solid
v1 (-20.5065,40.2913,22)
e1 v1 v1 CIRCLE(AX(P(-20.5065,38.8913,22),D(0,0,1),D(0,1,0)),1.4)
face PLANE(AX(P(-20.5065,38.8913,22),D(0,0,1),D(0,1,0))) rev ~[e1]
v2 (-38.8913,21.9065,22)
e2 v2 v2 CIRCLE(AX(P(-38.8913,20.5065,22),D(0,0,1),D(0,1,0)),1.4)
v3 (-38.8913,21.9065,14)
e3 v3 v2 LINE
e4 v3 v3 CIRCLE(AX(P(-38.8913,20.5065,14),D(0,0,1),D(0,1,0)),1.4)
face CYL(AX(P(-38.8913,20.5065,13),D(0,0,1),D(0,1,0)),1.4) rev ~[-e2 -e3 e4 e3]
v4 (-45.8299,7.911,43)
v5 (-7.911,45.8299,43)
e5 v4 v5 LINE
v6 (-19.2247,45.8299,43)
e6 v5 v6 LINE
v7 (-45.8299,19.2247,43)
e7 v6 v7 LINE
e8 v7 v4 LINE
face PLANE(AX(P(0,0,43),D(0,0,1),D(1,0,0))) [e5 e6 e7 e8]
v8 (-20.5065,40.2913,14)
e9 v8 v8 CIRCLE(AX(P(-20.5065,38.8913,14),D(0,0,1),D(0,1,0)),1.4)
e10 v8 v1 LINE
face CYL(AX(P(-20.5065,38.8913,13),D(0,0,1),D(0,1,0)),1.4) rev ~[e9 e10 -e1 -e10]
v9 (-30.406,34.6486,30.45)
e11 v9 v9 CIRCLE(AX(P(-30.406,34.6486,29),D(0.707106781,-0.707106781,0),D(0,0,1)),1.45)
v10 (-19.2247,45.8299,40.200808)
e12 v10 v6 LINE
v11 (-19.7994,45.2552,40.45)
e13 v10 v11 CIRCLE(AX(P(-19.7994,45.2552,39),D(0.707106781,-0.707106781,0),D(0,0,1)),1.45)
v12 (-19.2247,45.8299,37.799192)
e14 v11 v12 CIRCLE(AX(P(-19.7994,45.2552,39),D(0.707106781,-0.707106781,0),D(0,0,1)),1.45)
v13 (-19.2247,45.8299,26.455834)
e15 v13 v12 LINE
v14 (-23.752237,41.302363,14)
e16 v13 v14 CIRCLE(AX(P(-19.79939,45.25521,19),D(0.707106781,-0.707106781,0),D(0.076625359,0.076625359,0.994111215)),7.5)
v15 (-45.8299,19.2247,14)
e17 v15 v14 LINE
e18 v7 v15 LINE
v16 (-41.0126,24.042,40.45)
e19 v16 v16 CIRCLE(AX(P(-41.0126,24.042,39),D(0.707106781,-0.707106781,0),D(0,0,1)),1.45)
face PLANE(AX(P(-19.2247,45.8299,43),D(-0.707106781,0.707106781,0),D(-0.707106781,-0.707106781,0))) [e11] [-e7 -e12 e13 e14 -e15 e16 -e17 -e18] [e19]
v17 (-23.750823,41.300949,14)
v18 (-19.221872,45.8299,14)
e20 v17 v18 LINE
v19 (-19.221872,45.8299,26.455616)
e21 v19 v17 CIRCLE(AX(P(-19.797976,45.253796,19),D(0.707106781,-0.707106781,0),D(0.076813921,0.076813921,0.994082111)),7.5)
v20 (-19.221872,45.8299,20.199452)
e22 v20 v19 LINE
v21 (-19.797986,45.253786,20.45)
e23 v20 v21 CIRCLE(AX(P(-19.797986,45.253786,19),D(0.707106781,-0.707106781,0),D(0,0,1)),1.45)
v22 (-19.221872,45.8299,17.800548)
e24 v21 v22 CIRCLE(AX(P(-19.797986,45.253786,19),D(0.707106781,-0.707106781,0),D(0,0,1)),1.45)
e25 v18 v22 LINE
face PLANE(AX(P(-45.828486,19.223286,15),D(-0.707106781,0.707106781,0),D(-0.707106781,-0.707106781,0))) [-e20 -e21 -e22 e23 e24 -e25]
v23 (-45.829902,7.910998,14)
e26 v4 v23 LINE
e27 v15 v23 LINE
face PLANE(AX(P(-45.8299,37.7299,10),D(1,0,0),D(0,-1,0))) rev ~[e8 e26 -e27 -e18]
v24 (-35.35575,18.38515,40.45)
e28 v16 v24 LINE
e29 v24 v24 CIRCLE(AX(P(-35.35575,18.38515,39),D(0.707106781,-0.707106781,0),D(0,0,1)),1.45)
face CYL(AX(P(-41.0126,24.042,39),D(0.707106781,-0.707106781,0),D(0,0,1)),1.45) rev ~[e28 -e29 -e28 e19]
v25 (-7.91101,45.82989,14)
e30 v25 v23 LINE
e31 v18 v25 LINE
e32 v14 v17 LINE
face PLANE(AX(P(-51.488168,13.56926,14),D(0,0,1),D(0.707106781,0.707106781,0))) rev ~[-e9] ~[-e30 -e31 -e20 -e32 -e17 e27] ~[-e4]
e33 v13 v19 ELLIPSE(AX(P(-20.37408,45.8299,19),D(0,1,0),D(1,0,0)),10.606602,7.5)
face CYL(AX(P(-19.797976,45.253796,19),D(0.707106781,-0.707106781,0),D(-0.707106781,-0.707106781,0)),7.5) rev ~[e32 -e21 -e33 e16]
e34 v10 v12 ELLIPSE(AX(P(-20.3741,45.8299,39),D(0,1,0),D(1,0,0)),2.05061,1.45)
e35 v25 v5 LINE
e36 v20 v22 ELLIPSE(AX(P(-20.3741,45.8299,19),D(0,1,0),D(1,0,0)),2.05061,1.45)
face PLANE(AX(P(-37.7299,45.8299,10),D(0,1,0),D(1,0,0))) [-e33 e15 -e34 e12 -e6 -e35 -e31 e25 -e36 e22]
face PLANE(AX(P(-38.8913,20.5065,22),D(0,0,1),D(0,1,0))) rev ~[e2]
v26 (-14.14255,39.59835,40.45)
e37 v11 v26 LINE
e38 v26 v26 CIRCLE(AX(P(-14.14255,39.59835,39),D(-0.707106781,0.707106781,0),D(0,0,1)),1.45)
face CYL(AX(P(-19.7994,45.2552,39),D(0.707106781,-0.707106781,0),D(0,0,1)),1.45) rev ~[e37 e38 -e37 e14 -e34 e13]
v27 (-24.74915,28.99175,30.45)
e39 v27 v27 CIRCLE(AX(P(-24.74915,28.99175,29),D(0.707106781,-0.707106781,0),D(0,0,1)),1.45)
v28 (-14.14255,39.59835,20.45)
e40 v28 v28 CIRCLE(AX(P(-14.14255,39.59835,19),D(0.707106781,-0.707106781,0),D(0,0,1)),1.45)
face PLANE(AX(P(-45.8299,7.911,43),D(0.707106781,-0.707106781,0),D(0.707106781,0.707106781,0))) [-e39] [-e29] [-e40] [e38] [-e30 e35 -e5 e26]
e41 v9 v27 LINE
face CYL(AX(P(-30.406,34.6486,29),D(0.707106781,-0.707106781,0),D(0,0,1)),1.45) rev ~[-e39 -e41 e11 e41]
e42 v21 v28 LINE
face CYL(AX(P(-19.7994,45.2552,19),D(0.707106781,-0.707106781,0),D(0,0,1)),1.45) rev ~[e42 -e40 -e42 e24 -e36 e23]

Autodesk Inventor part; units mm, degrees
ref_plane "YZ Plane" through (0, 0, 0) normal (1, 0, 0) x (0, 1, 0)
ref_plane "XZ Plane" through (0, 0, 0) normal (0, 1, 0) x (-1, 0, 0)
ref_plane "Work Plane1" through (0, 0, 10) normal (0, 0, 1) x (1, 0, 0)
sketch "Sketch1" plane through (0, 0, 10) normal (0, 0, 1) x (1, 0, 0)
  line L0 (-4.0299, -0.3538) -> (-2.2322, 1.4439) construction
  arc A0 (-1.4439, 2.2322) -> (-2.2322, 1.4439) centre (-0.9299, 0.9299) ccw construction
  line L1 (-1.4439, 2.2322) -> (0.3538, 4.0299) construction
  line L2 (-37.8299, 42.8299) -> (-37.8299, 37.8299) construction
  line L3 (-37.8299, 37.8299) -> (-42.9208, 37.8299) construction
  line L4 (-37.8299, 42.2137) -> (-37.8299, 45.8299) construction
  line L5 (-37.8299, 45.8299) -> (-4.0299, 45.8299) construction
  line L6 (-4.0299, 45.8299) -> (-4.0299, 42.2137) construction
  line L7 (-4.0299, 4.0299) -> (0.3538, 4.0299) projected
  circle A1 centre (-20.9299, 20.9299) radius 17.5 projected
  line L8 (-20.9299, 58.9723) -> (17.1124, 20.9299) construction
  line L9 (17.1124, 20.9299) -> (-20.9299, -17.1124) construction
  line L10 (-20.9299, -17.1124) -> (-58.9723, 20.9299) construction
  line L11 (-58.9723, 20.9299) -> (-20.9299, 58.9723) construction
  line L12 (-20.9299, 58.9723) -> (-20.9299, -17.1124) construction
  line L13 (17.1124, 20.9299) -> (-58.9723, 20.9299) construction
  line L14 (-20.9299, 58.9723) -> (32.8701, 58.9723) construction
  line L15 (-43.4299, 43.4299) -> (1.5701, 43.4299) construction
  line L16 (1.5701, 43.4299) -> (1.5701, -1.5701) construction
  line L17 (1.5701, -1.5701) -> (-43.4299, -1.5701) construction
  line L18 (-43.4299, -1.5701) -> (-43.4299, 43.4299) construction
  line L19 (-43.4299, 43.4299) -> (1.5701, -1.5701) construction
  line L20 (1.5701, 43.4299) -> (-43.4299, -1.5701) construction
  line L21 (-43.4299, 5.3876) -> (-43.4299, 36.4723)
  line L22 (-43.4299, 36.4723) -> (-36.4723, 43.4299)
  line L23 (-36.4723, 43.4299) -> (-5.3876, 43.4299)
  line L24 (-5.3876, 43.4299) -> (1.5701, 36.4723)
  line L25 (1.5701, 36.4723) -> (1.5701, 5.3876)
  line L26 (1.5701, 5.3876) -> (-5.3876, -1.5701)
  line L27 (-5.3876, -1.5701) -> (-36.4723, -1.5701)
  line L28 (-36.4723, -1.5701) -> (-43.4299, 5.3876)
  line L29 (-4.0299, 42.2137) -> (-37.8299, 42.2137) projected
  line L30 (-4.0299, -0.3538) -> (-4.0299, 4.0299) projected
  circle A2 centre (-20.9299, 20.9299) radius 1.4
  line L31 (-10.9299, 10.9299) -> (-30.9299, 10.9299) construction
  line L32 (-30.9299, 10.9299) -> (-30.9299, 30.9299) construction
  line L33 (-30.9299, 30.9299) -> (-10.9299, 30.9299) construction
  line L34 (-10.9299, 30.9299) -> (-10.9299, 10.9299) construction
  line L35 (-10.9299, 10.9299) -> (-30.9299, 30.9299) construction
  line L36 (-30.9299, 10.9299) -> (-10.9299, 30.9299) construction
  circle A3 centre (-30.9299, 30.9299) radius 1.4
  circle A4 centre (-30.9299, 10.9299) radius 1.4
  circle A5 centre (-10.9299, 10.9299) radius 1.4
  line L37 (-45.8299, 37.8299) -> (-42.0723, 37.8299) construction
  line L38 (-42.1723, 37.7299) -> (-45.8299, 37.7299)
  line L39 (-45.8299, 37.7299) -> (-45.8299, 4.1299)
  line L40 (-45.8299, 4.1299) -> (-42.1723, 4.1299)
  line L41 (-42.1723, 4.1299) -> (-42.1723, 37.7299)
  line L42 (-45.8299, 4.0299) -> (-42.0723, 4.0299) construction
  line L43 (-45.8299, 37.8299) -> (-42.0723, 37.8299) projected
  line L44 (-37.7299, 45.8299) -> (-4.1299, 45.8299)
  line L45 (-4.1299, 45.8299) -> (-4.1299, 42.1723)
  line L46 (-4.1299, 42.1723) -> (-37.7299, 42.1723)
  line L47 (-37.7299, 42.1723) -> (-37.7299, 45.8299)
  line L48 (0.4701, 37.8299) -> (0.4701, 4.0299) construction
  line L49 (0.4701, 4.0299) -> (3.9701, 4.0299) construction
  line L50 (3.9701, 37.8299) -> (3.9701, 4.0299) construction
  line L51 (0.4701, 37.8299) -> (3.9701, 37.8299) construction
  line L52 (-45.8299, -3.9701) -> (-4.0299, -3.9701) construction
  line L53 (0.3124, 37.7299) -> (3.9701, 37.7299)
  line L54 (3.9701, 37.7299) -> (3.9701, 4.1299)
  line L55 (3.9701, 4.1299) -> (0.3124, 4.1299)
  line L56 (0.3124, 4.1299) -> (0.3124, 37.7299)
  line L57 (-4.1713, -0.3538) -> (-37.7299, -0.3538)
  line L58 (-37.7299, -0.3538) -> (-37.7299, -3.9701)
  line L59 (-37.7299, -3.9701) -> (-4.1713, -3.9701)
  line L60 (-4.1713, -3.9701) -> (-4.1713, -0.3538)
  point P0 (-37.8299, 4.0299)
  dimension "d18" = 53.8
  dimension "d19" = 45
  dimension "d20" = 53.8
  dimension "d21" = 45
  dimension "d22" = 45
  dimension "d30" = 20
  dimension "d31" = 20
  dimension "d32" = 2.8
  dimension "d33" = 2.8
  dimension "d34" = 2.8
  dimension "d35" = 2.8
  dimension "d36" = 0.1
  dimension "d37" = 0.1
  dimension "d38" = 0.1
  dimension "d39" = 0.1
extrude "Extrusion1" add sketch "Sketch1" along normal blind 5 contours L30 L26 L57 L28 L41 L22 L46 L24 L56 L7 | L7 L26 L30 | L56 L24 L25 L26 | L26 L25 L24 L53 L54 L55 | L60 L59 L58 L57 L28 L27 L26 | L26 L27 L28 L57 | L46 L22 L29 L24 | L24 L29 L45 | L40 L39 L38 L22 L21 L28 | L28 L21 L22 L41 | L29 L22 L23 L24 | L24 L23 L22 L29 L47 L44 L45 | L47 L29 L22 | A1 | A2 | A3 | A4 | A5
sketch "Sketch4" plane through (0, 0, 15) normal (0, 0, 1) x (1, 0, 0)
  line L0 (-37.7299, 42.1723) -> (-42.1723, 37.7299) projected
  line L1 (-42.1723, 37.7299) -> (-45.8299, 37.7299) projected
  line L2 (-45.8299, 37.7299) -> (-45.8299, 4.1299) projected
  line L3 (-45.8299, 4.1299) -> (-42.1723, 4.1299) projected
  line L4 (-42.1723, 4.1299) -> (-37.6885, -0.3538) projected
  line L5 (-37.6885, -0.3538) -> (-37.7299, -0.3538) projected
  line L6 (-37.7299, -0.3538) -> (-37.7299, -3.9701) projected
  line L7 (-37.7299, -3.9701) -> (-4.1713, -3.9701) projected
  line L8 (-4.1713, -3.9701) -> (-4.1713, -0.3538) projected
  line L9 (-4.1713, -0.3538) -> (0.3124, 4.1299) projected
  line L10 (0.3124, 4.1299) -> (3.9701, 4.1299) projected
  line L11 (3.9701, 4.1299) -> (3.9701, 37.7299) projected
  line L12 (3.9701, 37.7299) -> (0.3124, 37.7299) projected
  line L13 (0.3124, 37.7299) -> (-4.1299, 42.1723) projected
  line L14 (-4.1299, 42.1723) -> (-4.1299, 45.8299) projected
  line L15 (-4.1299, 45.8299) -> (-37.7299, 45.8299) projected
  line L16 (-37.7299, 45.8299) -> (-37.7299, 42.1723) projected
  line L17 (-45.8299, 37.7299) -> (-45.8299, 4.1299) projected
  line L18 (-45.8299, 7.911) -> (-7.911, 45.8299)
  line L19 (-45.8299, 7.911) -> (7.7955, 7.911) construction
  line L20 (-7.911, 45.8299) -> (-19.2247, 45.8299)
  line L21 (-4.1299, 45.8299) -> (-37.7299, 45.8299) projected
  line L22 (-19.2247, 45.8299) -> (-45.8299, 19.2247)
  line L23 (-45.8299, 7.911) -> (-45.8299, 19.2247)
  circle A0 centre (-40.9299, 0.9299) radius 1.1933 projected
  circle A1 centre (-0.9299, 40.9299) radius 1.4 projected
  line L24 (-40.9299, 0.9299) -> (-0.9299, 40.9299)
  line L25 (0.3124, 37.7299) -> (-4.1299, 42.1723) projected
  point P0 (0, 0)
  dimension "d40" = 45
  dimension "d41" = 8
extrude "Extrusion4" add sketch "Sketch4" along normal blind 28 contours L15 L18 L2 L22
sketch "Sketch5" plane through (-45.8299, 19.2247, 15) normal (-0.7071068, 0.7071068, 0) x (-0.7071068, -0.7071068, 0)
  line L0 (0, 0) -> (-37.6254, 0) projected
  line L1 (0, 0) -> (0, 28) projected
  line L2 (-37.6254, 28) -> (0, 28) projected
  line L3 (-37.6254, 0) -> (-37.6254, 28) projected
  circle A0 centre (-18.8127, 9.1873) radius 18.8127
  line L4 (-6.8127, 24) -> (-36.8127, 24) construction
  line L5 (-36.8127, 24) -> (-36.8127, 4) construction
  line L6 (-36.8127, 4) -> (-6.8127, 4) construction
  line L7 (-6.8127, 4) -> (-6.8127, 24) construction
  line L8 (-6.8127, 24) -> (-36.8127, 4) construction
  line L9 (-36.8127, 24) -> (-6.8127, 4) construction
  point P0 (-18.8127, -15)
  point P1 (-21.8127, 14)
  dimension "d44" = 30
  dimension "d45" = 20
hole "Hole1" at (-19.7994, 45.2552, 39) at (-19.7994, 45.2552, 19) at (-41.0126, 24.042, 39) at (-30.406, 34.6486, 29) direction (0.7071068, -0.7071068, 0) diameter 2.9 depth 12
sketch "Sketch6" plane through (-37.7299, -3.9701, 10) normal (0, -1, 0) x (1, 0, 0)
  circle A0 centre (-3.2, 36.9) radius 1.45 projected
  circle A1 centre (36.8, 36.9) radius 1.45 projected
  line L0 (-6.1, 0) -> (-6.1, 39.8) projected
  line L1 (-0.1, 0) -> (-6.1, 0) projected
  line L2 (-0.1, 33.8) -> (-0.1, 0) projected
  line L3 (33.7, 33.8) -> (-0.1, 33.8) projected
  line L4 (33.7, 33.8) -> (33.7, 0) projected
  line L5 (39.7, 0) -> (33.7, 0) projected
  line L6 (39.7, 39.8) -> (39.7, 0) projected
  line L7 (-6.1, 39.8) -> (39.7, 39.8) projected
  circle A2 centre (16.8, 16.9) radius 16.9
  circle A3 centre (16.8, 16.9) radius 14.9
  line L8 (-0.1, 16.9) -> (-0.1, 0)
  line L9 (0, 0) -> (33.5586, 0) projected
  line L10 (0.0414, 0) -> (-4.4423, 0) projected
  line L11 (33.5586, 0) -> (0.0414, 0)
  line L12 (33.7, 16.9) -> (33.5586, 0)
  point P0 (37.7299, -10)
  dimension "d53" = 2
extrude "Extrusion5" cut sketch "Sketch6" against normal up to surface contours A3 surface through (-45.8299, 7.911, 15) normal (0.7071068, -0.7071068, 0)
ref_plane "Work Plane3" through (3.9701, 45.8299, 26) normal (1, 0, 0) x (0, -1, 0)
sketch "Sketch7" plane through (3.9701, 45.8299, 26) normal (1, 0, 0) x (0, -1, 0)
  line L0 (41.8, -17.8) -> (41.8, 16) projected
  line L1 (8, -17.8) -> (41.8, -17.8) projected
  line L2 (8, -17.8) -> (8, 16) projected
  circle A0 centre (24.9, -0.9) radius 16.9
  circle A1 centre (24.9, -0.9) radius 14.9
  point P0 (45.8299, 26)
  dimension "d56" = 2
ref_plane "Work Plane4" through (-34.8055, 8.3289, 16.6138) normal (0.7071068, -0.7071068, 0) x (0.7071068, 0.7071068, 0)
extrude "Extrusion6" cut sketch "Sketch7" against normal up to surface contours A1 surface through (-45.8299, 7.911, 15) normal (0.7071068, -0.7071068, 0)
sketch "Sketch8" plane through (-45.8299, 19.2247, 15) normal (-0.7071068, 0.7071068, 0) x (-0.7071068, -0.7071068, 0)
  arc A0 (-37.6254, 2.7992) -> (-37.6254, 5.2008) centre (-36.8127, 4) ccw projected
  circle A1 centre (-36.8127, 4) radius 7.5
  point P0 (-18.8127, -15)
  dimension "d59" = 15
extrude "Extrusion7" cut sketch "Sketch8" along normal blind 10
sketch "Sketch9" plane through (0, 0, 10) normal (0, 0, -1) x (-1, 0, 0)
  line L0 (45.8299, 19.2247) -> (24.2855, 40.7692) projected
  line L1 (41.7776, 11.9633) -> (26.8705, 26.8705) projected
  line L2 (26.8705, 26.8705) -> (11.9633, 41.7776) projected
  line L3 (19.2247, 45.8299) -> (24.2855, 40.7692) projected
  line L4 (7.911, 45.8299) -> (11.9633, 41.7776) projected
  line L5 (41.7776, 11.9633) -> (45.8299, 7.911) projected
  line L6 (15.1679, 38.5731) -> (20.8247, 44.2299) projected
  line L7 (13.1172, 40.6237) -> (18.3235, 45.8299) projected
  line L8 (34.3304, 19.4105) -> (39.9873, 25.0673) projected
  line L9 (36.3811, 17.3599) -> (42.0379, 23.0167) projected
  circle A0 centre (20.5065, 38.8913) radius 1.4
  line L10 (25.7745, 27.9665) -> (31.4313, 33.6233) projected
  line L11 (31.4313, 33.6233) -> (25.7745, 27.9665)
  line L12 (26.8705, 26.8705) -> (32.5273, 32.5273)
  circle A1 centre (38.8913, 20.5065) radius 1.4
  point P0 (0, 0)
  point P1 (34.7528, 24.7491)
  dimension "d62" = 2.8
hole "Hole2" at (-20.5065, 38.8913, 10) at (-38.8913, 20.5065, 10) direction (0, 0, 1) diameter 2.8 depth 12 counterbore diameter 5.5 counterbore depth 3
sketch "Sketch11" plane through (0, 0, 43) normal (0, 0, 1) x (1, 0, 0)
  line L0 (-7.911, 45.8299) -> (-19.2247, 45.8299) projected
  line L1 (-19.2247, 45.8299) -> (-45.8299, 19.2247) projected
  line L2 (-45.8299, 19.2247) -> (-45.8299, 7.911) projected
  line L3 (-45.8299, 7.911) -> (-7.911, 45.8299) projected
  line L4 (-45.8299, 37.7299) -> (-45.8299, 19.2247) projected
  line L5 (-42.1723, 37.7299) -> (-45.8299, 37.7299) projected
  line L6 (-37.7299, 42.1723) -> (-42.1723, 37.7299) projected
  line L7 (-37.7299, 45.8299) -> (-37.7299, 42.1723) projected
  line L8 (-29.3463, 45.8299) -> (-37.7299, 45.8299) projected
  line L9 (-29.3463, 45.8299) -> (-19.2247, 45.8299) projected
  line L10 (-4.1299, 45.8299) -> (-7.911, 45.8299) projected
  line L11 (-4.1299, 42.1723) -> (-4.1299, 45.8299) projected
  line L12 (0.3124, 37.7299) -> (-4.1299, 42.1723) projected
  line L13 (3.9701, 37.7299) -> (0.3124, 37.7299) projected
  line L14 (3.9701, 29.8965) -> (3.9701, 11.9633) projected
  line L15 (3.9701, 29.8965) -> (3.9701, 37.7299) projected
  line L16 (-11.9633, -3.9701) -> (-4.1713, -3.9701) projected
  line L17 (-4.1713, -3.9701) -> (-4.1713, -0.3538) projected
  line L18 (-4.1713, -0.3538) -> (0.3124, 4.1299) projected
  line L19 (0.3124, 4.1299) -> (3.9701, 4.1299) projected
  line L20 (3.9701, 4.1299) -> (3.9701, 11.9633) projected
  line L21 (-11.9633, -3.9701) -> (-29.8965, -3.9701) projected
  line L22 (-37.7299, -3.9701) -> (-29.8965, -3.9701) projected
  line L23 (-37.7299, -0.3538) -> (-37.7299, -3.9701) projected
  line L24 (-45.8299, 7.911) -> (-7.911, 45.8299) projected
  line L25 (-45.8299, 7.911) -> (-7.911, 45.8299)
  line L26 (-45.8299, 7.911) -> (-45.8299, 4.1299) projected
  line L27 (-45.8299, 4.1299) -> (-42.1723, 4.1299) projected
  line L28 (-37.6885, -0.3538) -> (-37.7299, -0.3538) projected
  line L29 (-42.1723, 4.1299) -> (-37.6885, -0.3538) projected
  point P0 (0, 0)
extrude "Extrusion8" cut sketch "Sketch11" against normal through all contours L10 L11 L12 L13 L15 L14 L20 L19 L18 L17 L16 L21 L22 L23 L28 L29 L27 L26 L3 | L1 L4 L5 L6 L7 L8 L9
sketch "Sketch12" plane through (-45.8299, 19.2247, 10) normal (-0.7071068, 0.7071068, 0) x (-0.7071068, -0.7071068, 0)
  line L0 (-45.6254, 33) -> (-45.6254, 0) projected
  line L1 (8, 0) -> (8, 33) projected
  line L2 (-45.6254, 0) -> (8, 0)
  line L3 (8, 0) -> (8, 4)
  line L4 (8, 4) -> (-45.6254, 4)
  line L5 (-45.6254, 4) -> (-45.6254, 0)
  point P0 (-18.8127, -10)
  point P1 (45.6254, -4)
  point P2 (45.6254, -5)
  point P3 (-8, -5)
  point P4 (-8, -4)
  dimension "d73" = 4
extrude "Extrusion9" cut sketch "Sketch12" against normal blind 29
properties part number "20_Cube_Insert_Kinematic_Mirrormount_45_base_part2"
